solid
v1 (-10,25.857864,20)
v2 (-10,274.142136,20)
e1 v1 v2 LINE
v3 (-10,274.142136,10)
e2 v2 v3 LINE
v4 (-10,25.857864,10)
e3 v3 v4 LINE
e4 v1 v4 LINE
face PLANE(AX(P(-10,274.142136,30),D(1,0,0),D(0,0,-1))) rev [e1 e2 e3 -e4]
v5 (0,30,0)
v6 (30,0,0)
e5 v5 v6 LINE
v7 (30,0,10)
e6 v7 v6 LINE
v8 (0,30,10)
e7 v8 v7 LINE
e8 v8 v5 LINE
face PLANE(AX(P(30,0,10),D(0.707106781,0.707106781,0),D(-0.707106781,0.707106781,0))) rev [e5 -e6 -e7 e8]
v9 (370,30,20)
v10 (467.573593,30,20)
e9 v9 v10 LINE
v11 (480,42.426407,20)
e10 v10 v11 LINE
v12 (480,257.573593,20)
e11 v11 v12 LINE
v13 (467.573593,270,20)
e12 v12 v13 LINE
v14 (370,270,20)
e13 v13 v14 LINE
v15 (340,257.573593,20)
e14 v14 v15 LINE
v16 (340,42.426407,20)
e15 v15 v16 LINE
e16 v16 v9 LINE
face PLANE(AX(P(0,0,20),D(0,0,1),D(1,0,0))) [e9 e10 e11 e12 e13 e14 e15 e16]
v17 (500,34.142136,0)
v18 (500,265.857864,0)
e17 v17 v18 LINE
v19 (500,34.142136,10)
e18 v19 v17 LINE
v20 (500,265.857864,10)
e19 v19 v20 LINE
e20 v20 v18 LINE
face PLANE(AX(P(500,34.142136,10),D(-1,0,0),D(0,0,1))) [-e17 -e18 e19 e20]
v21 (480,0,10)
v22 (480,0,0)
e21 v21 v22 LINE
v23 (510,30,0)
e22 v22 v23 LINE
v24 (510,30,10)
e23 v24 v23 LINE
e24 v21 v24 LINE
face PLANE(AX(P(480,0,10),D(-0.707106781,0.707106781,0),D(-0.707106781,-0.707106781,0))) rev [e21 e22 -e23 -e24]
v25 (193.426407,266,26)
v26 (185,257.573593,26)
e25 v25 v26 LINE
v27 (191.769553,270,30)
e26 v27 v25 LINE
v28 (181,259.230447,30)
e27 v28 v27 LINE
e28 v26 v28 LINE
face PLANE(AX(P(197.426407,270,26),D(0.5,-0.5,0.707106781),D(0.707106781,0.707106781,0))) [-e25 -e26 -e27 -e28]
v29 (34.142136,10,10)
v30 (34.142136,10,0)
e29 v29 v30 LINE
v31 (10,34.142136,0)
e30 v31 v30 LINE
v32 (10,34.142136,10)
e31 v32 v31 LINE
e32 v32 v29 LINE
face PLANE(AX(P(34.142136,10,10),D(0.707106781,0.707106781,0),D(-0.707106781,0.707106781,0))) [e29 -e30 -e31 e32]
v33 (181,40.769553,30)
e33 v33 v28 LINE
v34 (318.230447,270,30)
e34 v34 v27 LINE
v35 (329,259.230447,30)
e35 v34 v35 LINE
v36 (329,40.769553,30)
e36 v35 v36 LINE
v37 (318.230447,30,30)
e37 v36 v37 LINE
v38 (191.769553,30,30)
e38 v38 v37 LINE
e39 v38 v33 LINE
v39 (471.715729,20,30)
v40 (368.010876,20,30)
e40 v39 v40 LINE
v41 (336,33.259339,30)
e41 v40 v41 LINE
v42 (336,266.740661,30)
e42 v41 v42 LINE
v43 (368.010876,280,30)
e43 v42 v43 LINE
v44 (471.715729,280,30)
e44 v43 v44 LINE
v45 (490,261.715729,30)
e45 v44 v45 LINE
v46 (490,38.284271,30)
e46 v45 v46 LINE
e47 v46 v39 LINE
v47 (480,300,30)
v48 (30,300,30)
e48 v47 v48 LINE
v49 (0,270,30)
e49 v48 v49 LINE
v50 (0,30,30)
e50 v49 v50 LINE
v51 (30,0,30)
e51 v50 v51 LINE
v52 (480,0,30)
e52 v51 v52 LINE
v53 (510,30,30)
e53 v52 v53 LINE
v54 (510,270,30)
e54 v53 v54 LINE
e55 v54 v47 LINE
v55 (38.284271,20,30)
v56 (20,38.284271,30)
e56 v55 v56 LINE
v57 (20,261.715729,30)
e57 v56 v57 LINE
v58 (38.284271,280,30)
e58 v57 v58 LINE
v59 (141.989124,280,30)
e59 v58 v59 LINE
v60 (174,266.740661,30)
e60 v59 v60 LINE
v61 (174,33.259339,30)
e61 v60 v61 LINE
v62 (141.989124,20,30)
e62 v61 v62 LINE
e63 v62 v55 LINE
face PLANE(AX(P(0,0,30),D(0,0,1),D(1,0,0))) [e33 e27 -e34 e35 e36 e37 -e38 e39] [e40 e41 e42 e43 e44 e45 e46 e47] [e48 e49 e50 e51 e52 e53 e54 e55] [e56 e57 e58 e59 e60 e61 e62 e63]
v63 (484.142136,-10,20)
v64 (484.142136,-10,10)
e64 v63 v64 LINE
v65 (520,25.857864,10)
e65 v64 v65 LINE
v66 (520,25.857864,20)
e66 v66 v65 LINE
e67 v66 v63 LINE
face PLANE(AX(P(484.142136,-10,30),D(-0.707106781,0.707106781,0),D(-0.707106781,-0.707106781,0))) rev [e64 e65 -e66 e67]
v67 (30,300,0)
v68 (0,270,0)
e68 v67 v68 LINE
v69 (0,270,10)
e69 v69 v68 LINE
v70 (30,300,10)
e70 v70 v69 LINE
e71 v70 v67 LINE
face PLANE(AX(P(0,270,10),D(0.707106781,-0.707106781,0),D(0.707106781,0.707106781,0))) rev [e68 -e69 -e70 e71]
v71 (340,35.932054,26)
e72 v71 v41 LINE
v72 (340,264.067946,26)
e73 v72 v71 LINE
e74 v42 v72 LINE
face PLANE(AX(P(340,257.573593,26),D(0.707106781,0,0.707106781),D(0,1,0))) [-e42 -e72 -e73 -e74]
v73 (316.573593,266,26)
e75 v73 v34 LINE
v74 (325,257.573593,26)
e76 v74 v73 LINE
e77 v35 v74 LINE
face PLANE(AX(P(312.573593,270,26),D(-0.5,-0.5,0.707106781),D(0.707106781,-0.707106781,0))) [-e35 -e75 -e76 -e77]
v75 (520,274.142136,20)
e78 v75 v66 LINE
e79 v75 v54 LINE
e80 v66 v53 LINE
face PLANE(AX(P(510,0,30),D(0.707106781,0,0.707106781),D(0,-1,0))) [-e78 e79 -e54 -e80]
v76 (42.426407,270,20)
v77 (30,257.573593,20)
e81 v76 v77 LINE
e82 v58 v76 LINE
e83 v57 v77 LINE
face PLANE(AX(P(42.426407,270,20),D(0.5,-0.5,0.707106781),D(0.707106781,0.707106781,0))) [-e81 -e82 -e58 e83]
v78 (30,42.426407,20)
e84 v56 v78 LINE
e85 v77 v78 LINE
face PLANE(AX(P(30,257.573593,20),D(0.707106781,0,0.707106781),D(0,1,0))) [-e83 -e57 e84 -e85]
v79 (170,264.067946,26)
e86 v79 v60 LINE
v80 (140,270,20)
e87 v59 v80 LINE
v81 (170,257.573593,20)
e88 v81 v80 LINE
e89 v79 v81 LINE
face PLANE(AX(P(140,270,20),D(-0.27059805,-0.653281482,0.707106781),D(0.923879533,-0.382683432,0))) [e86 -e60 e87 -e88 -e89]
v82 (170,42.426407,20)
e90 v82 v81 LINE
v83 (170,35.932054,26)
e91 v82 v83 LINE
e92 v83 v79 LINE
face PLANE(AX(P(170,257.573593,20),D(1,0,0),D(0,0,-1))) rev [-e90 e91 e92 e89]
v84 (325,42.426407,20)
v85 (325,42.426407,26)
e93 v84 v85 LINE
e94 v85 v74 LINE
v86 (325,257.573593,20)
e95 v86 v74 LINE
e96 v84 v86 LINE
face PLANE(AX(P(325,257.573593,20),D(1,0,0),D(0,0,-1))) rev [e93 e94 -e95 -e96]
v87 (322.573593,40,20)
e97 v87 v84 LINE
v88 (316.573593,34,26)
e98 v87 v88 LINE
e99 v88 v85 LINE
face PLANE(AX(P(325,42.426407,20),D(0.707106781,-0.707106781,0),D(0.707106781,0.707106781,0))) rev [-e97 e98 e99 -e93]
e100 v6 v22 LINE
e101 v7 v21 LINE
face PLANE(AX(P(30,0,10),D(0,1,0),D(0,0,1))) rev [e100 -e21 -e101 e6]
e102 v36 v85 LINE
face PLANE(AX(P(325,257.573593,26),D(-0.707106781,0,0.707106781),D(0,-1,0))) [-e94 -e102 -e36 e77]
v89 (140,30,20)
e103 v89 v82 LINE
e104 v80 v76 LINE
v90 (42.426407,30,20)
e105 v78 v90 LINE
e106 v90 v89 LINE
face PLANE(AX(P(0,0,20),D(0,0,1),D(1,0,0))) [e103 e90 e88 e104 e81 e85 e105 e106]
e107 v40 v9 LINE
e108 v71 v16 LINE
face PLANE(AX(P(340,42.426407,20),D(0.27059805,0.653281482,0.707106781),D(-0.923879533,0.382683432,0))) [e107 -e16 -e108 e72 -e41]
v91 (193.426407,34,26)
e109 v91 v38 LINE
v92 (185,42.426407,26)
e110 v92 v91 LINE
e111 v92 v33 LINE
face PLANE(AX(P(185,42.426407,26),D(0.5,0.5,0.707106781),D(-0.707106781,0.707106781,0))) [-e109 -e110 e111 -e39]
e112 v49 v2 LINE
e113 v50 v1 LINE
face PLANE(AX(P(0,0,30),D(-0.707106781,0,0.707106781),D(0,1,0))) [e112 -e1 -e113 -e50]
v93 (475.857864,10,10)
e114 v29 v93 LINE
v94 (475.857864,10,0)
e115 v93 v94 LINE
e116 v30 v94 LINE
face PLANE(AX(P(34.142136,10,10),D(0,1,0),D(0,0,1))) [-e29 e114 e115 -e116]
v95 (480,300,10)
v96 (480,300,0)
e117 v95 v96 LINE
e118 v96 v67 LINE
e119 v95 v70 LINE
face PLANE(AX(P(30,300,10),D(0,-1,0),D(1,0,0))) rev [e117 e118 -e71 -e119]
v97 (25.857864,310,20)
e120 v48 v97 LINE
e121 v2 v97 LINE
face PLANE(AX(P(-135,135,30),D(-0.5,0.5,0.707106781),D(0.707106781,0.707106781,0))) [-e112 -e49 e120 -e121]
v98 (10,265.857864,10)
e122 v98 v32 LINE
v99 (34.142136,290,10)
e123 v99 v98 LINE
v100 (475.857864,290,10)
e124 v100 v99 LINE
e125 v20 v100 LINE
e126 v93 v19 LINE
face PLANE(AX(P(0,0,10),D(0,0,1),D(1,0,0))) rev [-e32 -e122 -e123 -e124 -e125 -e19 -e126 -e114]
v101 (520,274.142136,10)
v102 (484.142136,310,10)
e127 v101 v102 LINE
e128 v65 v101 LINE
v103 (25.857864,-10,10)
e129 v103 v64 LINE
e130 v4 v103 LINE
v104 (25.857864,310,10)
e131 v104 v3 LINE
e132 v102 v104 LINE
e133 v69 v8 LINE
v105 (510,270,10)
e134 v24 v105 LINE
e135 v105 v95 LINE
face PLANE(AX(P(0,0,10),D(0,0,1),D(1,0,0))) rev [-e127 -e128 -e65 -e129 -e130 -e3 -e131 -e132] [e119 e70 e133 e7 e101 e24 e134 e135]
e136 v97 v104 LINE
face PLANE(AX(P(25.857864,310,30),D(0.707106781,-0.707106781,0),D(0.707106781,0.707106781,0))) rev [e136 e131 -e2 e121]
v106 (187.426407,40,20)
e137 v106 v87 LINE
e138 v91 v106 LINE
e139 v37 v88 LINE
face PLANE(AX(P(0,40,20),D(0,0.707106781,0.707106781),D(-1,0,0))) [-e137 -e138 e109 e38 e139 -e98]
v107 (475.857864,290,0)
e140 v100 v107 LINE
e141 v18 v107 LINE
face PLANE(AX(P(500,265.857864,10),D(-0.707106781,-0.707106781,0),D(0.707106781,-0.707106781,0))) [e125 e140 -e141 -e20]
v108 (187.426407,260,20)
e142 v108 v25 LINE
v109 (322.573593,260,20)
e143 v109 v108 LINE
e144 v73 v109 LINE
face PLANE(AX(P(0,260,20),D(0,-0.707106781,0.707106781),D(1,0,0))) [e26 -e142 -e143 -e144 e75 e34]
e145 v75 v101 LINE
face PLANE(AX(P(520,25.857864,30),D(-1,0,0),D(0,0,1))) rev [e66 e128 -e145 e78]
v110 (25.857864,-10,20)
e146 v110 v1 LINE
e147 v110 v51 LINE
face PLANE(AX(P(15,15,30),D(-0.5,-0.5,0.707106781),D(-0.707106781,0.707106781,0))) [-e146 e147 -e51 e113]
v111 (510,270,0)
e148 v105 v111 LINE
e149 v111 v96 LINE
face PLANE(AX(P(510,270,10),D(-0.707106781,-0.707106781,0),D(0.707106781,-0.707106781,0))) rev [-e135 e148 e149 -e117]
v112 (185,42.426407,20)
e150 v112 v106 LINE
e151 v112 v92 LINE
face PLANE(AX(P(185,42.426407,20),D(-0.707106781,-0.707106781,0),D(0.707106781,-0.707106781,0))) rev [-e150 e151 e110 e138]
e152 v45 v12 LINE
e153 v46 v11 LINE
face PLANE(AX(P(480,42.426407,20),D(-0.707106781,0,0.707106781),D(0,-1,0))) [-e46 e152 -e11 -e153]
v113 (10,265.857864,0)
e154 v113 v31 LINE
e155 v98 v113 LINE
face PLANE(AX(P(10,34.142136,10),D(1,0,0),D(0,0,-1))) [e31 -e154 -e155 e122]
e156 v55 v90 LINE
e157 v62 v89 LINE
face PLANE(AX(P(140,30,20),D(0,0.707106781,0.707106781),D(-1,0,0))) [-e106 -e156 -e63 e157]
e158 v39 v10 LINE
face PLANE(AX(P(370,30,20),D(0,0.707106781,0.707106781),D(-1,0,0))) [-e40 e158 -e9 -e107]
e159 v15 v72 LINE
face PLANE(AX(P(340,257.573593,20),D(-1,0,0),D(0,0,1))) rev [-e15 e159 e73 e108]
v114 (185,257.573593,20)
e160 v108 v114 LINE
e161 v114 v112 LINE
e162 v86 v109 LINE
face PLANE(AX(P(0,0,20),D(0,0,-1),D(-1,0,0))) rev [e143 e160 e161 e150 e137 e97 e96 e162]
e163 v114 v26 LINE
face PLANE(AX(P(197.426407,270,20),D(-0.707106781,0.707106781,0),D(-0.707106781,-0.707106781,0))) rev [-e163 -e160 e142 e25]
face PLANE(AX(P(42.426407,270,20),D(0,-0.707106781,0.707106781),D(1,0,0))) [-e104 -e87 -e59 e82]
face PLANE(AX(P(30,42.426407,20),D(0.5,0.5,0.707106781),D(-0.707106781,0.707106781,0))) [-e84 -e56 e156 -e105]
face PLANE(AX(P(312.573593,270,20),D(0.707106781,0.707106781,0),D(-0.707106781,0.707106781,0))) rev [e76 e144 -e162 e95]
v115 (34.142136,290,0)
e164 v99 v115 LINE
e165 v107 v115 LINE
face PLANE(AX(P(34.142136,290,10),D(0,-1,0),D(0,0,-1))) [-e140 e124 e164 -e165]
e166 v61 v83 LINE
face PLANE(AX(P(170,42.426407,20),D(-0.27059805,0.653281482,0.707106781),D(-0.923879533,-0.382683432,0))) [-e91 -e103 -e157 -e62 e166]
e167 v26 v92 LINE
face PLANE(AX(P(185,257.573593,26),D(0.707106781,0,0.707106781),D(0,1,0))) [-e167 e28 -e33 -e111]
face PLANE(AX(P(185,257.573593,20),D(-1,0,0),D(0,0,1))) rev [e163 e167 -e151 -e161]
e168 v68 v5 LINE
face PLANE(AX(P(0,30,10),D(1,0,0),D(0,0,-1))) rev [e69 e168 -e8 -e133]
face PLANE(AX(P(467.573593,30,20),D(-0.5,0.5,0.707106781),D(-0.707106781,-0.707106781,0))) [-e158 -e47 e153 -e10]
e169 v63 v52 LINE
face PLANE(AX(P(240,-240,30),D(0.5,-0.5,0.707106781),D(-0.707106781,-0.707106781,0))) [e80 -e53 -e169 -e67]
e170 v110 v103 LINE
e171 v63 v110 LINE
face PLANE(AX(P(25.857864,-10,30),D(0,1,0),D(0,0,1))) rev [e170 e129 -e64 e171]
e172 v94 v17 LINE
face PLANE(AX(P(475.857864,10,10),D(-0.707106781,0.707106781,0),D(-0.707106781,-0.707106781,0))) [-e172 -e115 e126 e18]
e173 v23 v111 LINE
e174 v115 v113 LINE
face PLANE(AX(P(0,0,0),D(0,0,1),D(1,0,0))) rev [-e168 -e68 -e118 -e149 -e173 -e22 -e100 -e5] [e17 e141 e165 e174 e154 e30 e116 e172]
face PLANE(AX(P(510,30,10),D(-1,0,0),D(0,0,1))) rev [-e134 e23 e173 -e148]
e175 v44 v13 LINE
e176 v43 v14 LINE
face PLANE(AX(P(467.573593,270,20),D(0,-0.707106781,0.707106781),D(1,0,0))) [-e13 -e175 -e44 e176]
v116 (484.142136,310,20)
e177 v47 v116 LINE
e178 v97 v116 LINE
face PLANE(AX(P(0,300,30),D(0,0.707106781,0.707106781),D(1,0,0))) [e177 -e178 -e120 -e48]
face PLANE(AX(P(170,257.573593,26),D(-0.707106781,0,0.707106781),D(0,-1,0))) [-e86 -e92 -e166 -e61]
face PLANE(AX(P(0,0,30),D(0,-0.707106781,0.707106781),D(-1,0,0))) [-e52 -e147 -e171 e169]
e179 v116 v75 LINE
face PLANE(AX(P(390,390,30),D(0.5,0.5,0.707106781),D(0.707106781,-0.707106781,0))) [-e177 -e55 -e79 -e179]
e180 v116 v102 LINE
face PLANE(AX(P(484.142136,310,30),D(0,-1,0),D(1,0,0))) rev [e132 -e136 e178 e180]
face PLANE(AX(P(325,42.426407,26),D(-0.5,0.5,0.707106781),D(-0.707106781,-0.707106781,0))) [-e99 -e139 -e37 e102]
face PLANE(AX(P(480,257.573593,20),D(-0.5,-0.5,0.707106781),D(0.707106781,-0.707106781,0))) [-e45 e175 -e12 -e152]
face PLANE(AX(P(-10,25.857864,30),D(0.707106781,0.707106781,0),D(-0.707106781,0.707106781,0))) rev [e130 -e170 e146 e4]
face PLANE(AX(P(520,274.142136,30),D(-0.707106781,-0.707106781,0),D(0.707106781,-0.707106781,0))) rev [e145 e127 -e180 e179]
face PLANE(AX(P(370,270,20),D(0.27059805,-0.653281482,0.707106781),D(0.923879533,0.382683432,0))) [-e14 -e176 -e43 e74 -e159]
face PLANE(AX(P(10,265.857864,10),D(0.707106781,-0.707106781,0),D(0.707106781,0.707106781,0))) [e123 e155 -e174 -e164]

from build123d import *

# Parameters (mm, degrees)
BOSS_EXTRU_1_DEPTH      = 10
BOSS_EXTRU_2_DEPTH      = 20
ENL_V_MAT_EXTRU_1_DEPTH = 10
CHANFREIN1_SIZE         = 10
CHANFREIN2_SIZE         = 10
CHANFREIN3_SIZE         = 4


# Some blends are built 0.0001 mm under size
with BuildPart() as part:
    # Esquisse1 → Boss.-Extru.1 (new body)
    with BuildSketch(Plane.XY):
        Polygon((0, 270), (30, 300), (480, 300), (510, 270), (510, 30), (480, 0), (30, 0), (0, 30), align=None)
        Polygon((10, 265.857864376), (34.142135624, 290), (475.857864376, 290), (500, 265.857864376), (500, 34.142135624), (475.857864376, 10), (34.142135624, 10), (10, 34.142135624), align=None, mode=Mode.SUBTRACT)
    extrude(amount=BOSS_EXTRU_1_DEPTH)

    # Esquisse2 → Boss.-Extru.2 (add)
    with BuildSketch(Plane.XY.offset(10)):
        Polygon((484.142135624, 310), (25.857864376, 310), (-10, 274.142135624), (-10, 25.857864376), (25.857864376, -10), (484.142135624, -10), (520, 25.857864376), (520, 274.142135624), align=None)
    extrude(amount=BOSS_EXTRU_2_DEPTH)

    # Esquisse3 → Enlèv. mat.-Extru.1 (cut)
    with BuildSketch(Plane.XY.offset(30)):
        Polygon((42.426406871, 270), (140, 270), (170, 257.573593129), (170, 42.426406871), (140, 30), (42.426406871, 30), (30, 42.426406871), (30, 257.573593129), align=None)
        Polygon((480, 257.573593129), (467.573593129, 270), (370, 270), (340, 257.573593129), (340, 42.426406871), (370, 30), (467.573593129, 30), (480, 42.426406871), align=None)
        Polygon((197.426406871, 270), (185, 257.573593129), (185, 42.426406871), (197.426406871, 30), (312.573593129, 30), (325, 42.426406871), (325, 257.573593129), (312.573593129, 270), (255, 270), align=None)
    extrude(amount=-ENL_V_MAT_EXTRU_1_DEPTH, mode=Mode.SUBTRACT)

    # Chanfrein1
    chanfrein1_edges = [part.edges().sort_by_distance(p)[0] for p in [
        (520, 150, 30),
        (502.071067812, 7.928932188, 30),
        (255, -10, 30),
        (7.928932188, 7.928932188, 30),
        (-10, 150, 30),
        (7.928932188, 292.071067812, 30),
        (255, 310, 30),
        (502.071067812, 292.071067812, 30),
        (473.786796564, 263.786796564, 30),
        (418.786796564, 270, 30),
        (355, 263.786796564, 30),
        (355, 36.213203436, 30),
        (418.786796564, 30, 30),
        (473.786796564, 36.213203436, 30),
        (480, 150, 30),
        (155, 36.213203436, 30),
        (155, 263.786796564, 30),
        (91.213203436, 270, 30),
        (36.213203436, 263.786796564, 30),
        (30, 150, 30),
        (36.213203436, 36.213203436, 30),
        (91.213203436, 30, 30),
    ]]
    chamfer(chanfrein1_edges, length=CHANFREIN1_SIZE - 0.0001)  # a hair under: the kernel refuses the full size

    # Chanfrein2
    chanfrein2_edges = [part.edges().sort_by_distance(p)[0] for p in [
        (255, 30, 20),
        (255, 270, 20),
    ]]
    chamfer(chanfrein2_edges, length=CHANFREIN2_SIZE - 0.0001)  # a hair under: the kernel refuses the full size

    # Chanfrein3
    # the kernel refuses this chamfer: 4 mm, written as the material it takes off along each edge
    with BuildSketch(Plane(origin=(340, 21.315861156, 30), x_dir=(-0.9996219169112968, 0, 0.027495876610586605), z_dir=(0, 1, 0))) as chanfrein3_piece_1_section:
        Polygon((CHANFREIN3_SIZE * 0.999621916911, -CHANFREIN3_SIZE * 0.0274958766106), (-CHANFREIN3_SIZE * 0.0274958766106, -CHANFREIN3_SIZE * 0.999621916911), (0, 0), align=None)
    chanfrein3_piece_1 = extrude(amount=257.368277689, mode=Mode.PRIVATE)
    chanfrein3_piece_1 = split(chanfrein3_piece_1, bisect_by=Plane(origin=(318.097162936, 199.689892736, -25.095613192), z_dir=(0.27059805007309734, -0.6532814824381883, 0.707106781186548)), keep=Keep.TOP, mode=Mode.PRIVATE)
    chanfrein3_piece_1 = split(chanfrein3_piece_1, bisect_by=Plane(origin=(318.097162936, 100.310107264, -25.095613192), z_dir=(0.27059805007309695, 0.6532814824381893, 0.7071067811865472)), keep=Keep.TOP, mode=Mode.PRIVATE)
    add(chanfrein3_piece_1, mode=Mode.SUBTRACT)
    with BuildSketch(Plane(origin=(170, 278.684138844, 30), x_dir=(0.9996219169112968, 0, 0.027495876610586414), z_dir=(0, -1, 0))) as chanfrein3_piece_2_section:
        Polygon((CHANFREIN3_SIZE * 0.999621916911, -CHANFREIN3_SIZE * 0.0274958766106), (-CHANFREIN3_SIZE * 0.0274958766106, -CHANFREIN3_SIZE * 0.999621916911), (0, 0), align=None)
    chanfrein3_piece_2 = extrude(amount=257.368277689, mode=Mode.PRIVATE)
    chanfrein3_piece_2 = split(chanfrein3_piece_2, bisect_by=Plane(origin=(191.902837064, 100.310107264, -25.095613192), z_dir=(-0.27059805007309856, 0.6532814824381883, 0.7071067811865475)), keep=Keep.TOP, mode=Mode.PRIVATE)
    chanfrein3_piece_2 = split(chanfrein3_piece_2, bisect_by=Plane(origin=(191.902837064, 199.689892736, -25.095613192), z_dir=(-0.2705980500730966, -0.6532814824381884, 0.7071067811865482)), keep=Keep.TOP, mode=Mode.PRIVATE)
    add(chanfrein3_piece_2, mode=Mode.SUBTRACT)
    with BuildSketch(Plane(origin=(332.273817919, 250.299775209, 30), x_dir=(-0.019442520806006888, -0.019442520806006888, -0.999621916911297), z_dir=(-0.7071067811865476, 0.7071067811865476, 0))) as chanfrein3_piece_3_section:
        Polygon((CHANFREIN3_SIZE * 0.999621916911, -CHANFREIN3_SIZE * 0.0274958766106), (-CHANFREIN3_SIZE * 0.0274958766106, -CHANFREIN3_SIZE * 0.999621916911), (0, 0), align=None)
    chanfrein3_piece_3 = extrude(amount=38.147057033, mode=Mode.PRIVATE)
    chanfrein3_piece_3 = split(chanfrein3_piece_3, bisect_by=Plane(origin=(320.298394929, 266.355378959, 26.355278959), z_dir=(0, -0.7071067811865467, 0.7071067811865485)), keep=Keep.TOP, mode=Mode.PRIVATE)
    chanfrein3_piece_3 = split(chanfrein3_piece_3, bisect_by=Plane(origin=(320.298394929, 270, 28.707260693), z_dir=(0, -1, 0)), keep=Keep.TOP, mode=Mode.PRIVATE)
    chanfrein3_piece_3 = split(chanfrein3_piece_3, bisect_by=Plane(origin=(325, 264.003397225, 28.707260693), z_dir=(-1, 0, 0)), keep=Keep.TOP, mode=Mode.PRIVATE)
    add(chanfrein3_piece_3, mode=Mode.SUBTRACT)
    with BuildSketch(Plane(origin=(204.700224791, 277.273817919, 30), x_dir=(0.019442520806013792, -0.019442520806013792, -0.9996219169112968), z_dir=(-0.7071067811865476, -0.7071067811865476, 0))) as chanfrein3_piece_4_section:
        Polygon((CHANFREIN3_SIZE * 0.999621916911, -CHANFREIN3_SIZE * 0.0274958766106), (-CHANFREIN3_SIZE * 0.0274958766106, -CHANFREIN3_SIZE * 0.999621916911), (0, 0), align=None)
    chanfrein3_piece_4 = extrude(amount=38.147057033, mode=Mode.PRIVATE)
    chanfrein3_piece_4 = split(chanfrein3_piece_4, bisect_by=Plane(origin=(189.701605071, 270, 28.707260693), z_dir=(0, -1, 0)), keep=Keep.TOP, mode=Mode.PRIVATE)
    chanfrein3_piece_4 = split(chanfrein3_piece_4, bisect_by=Plane(origin=(189.701605071, 266.355378959, 26.355278959), z_dir=(0, -0.7071067811865467, 0.7071067811865485)), keep=Keep.TOP, mode=Mode.PRIVATE)
    chanfrein3_piece_4 = split(chanfrein3_piece_4, bisect_by=Plane(origin=(185, 264.003397225, 28.707260693), z_dir=(1, 0, 0)), keep=Keep.TOP, mode=Mode.PRIVATE)
    add(chanfrein3_piece_4, mode=Mode.SUBTRACT)
    with BuildSketch(Plane(origin=(185, 267.860325081, 30), x_dir=(0.02749587661058907, 0, -0.9996219169112965), z_dir=(0, -1, 0))) as chanfrein3_piece_5_section:
        Polygon((CHANFREIN3_SIZE * 0.999621916911, -CHANFREIN3_SIZE * 0.0274958766106), (-CHANFREIN3_SIZE * 0.0274958766106, -CHANFREIN3_SIZE * 0.999621916911), (0, 0), align=None)
    chanfrein3_piece_5 = extrude(amount=235.720650161, mode=Mode.PRIVATE)
    chanfrein3_piece_5 = split(chanfrein3_piece_5, bisect_by=Plane(origin=(130.558397351, 203.13199048, 28.675713426), z_dir=(0.7071067811865476, -0.7071067811865476, 0)), keep=Keep.TOP, mode=Mode.PRIVATE)
    chanfrein3_piece_5 = split(chanfrein3_piece_5, bisect_by=Plane(origin=(130.558397351, 96.86800952, 28.675713426), z_dir=(0.7071067811865475, 0.7071067811865477, 0)), keep=Keep.TOP, mode=Mode.PRIVATE)
    add(chanfrein3_piece_5, mode=Mode.SUBTRACT)
    with BuildSketch(Plane(origin=(177.726182081, 49.700224791, 30), x_dir=(0.01944252080601465, 0.019442520806014656, -0.9996219169112968), z_dir=(0.7071067811865477, -0.7071067811865475, 0))) as chanfrein3_piece_6_section:
        Polygon((CHANFREIN3_SIZE * 0.999621916911, -CHANFREIN3_SIZE * 0.0274958766106), (-CHANFREIN3_SIZE * 0.0274958766106, -CHANFREIN3_SIZE * 0.999621916911), (0, 0), align=None)
    chanfrein3_piece_6 = extrude(amount=38.147057033, mode=Mode.PRIVATE)
    chanfrein3_piece_6 = split(chanfrein3_piece_6, bisect_by=Plane(origin=(185, 35.996602775, 28.707260693), z_dir=(1, 0, 0)), keep=Keep.TOP, mode=Mode.PRIVATE)
    chanfrein3_piece_6 = split(chanfrein3_piece_6, bisect_by=Plane(origin=(189.701605071, 30, 28.707260693), z_dir=(0, 1, 0)), keep=Keep.TOP, mode=Mode.PRIVATE)
    chanfrein3_piece_6 = split(chanfrein3_piece_6, bisect_by=Plane(origin=(189.701605071, 33.644621041, 26.355278959), z_dir=(0, 0.7071067811865475, 0.7071067811865477)), keep=Keep.TOP, mode=Mode.PRIVATE)
    add(chanfrein3_piece_6, mode=Mode.SUBTRACT)
    with BuildSketch(Plane(origin=(305.299775209, 22.726182081, 30), x_dir=(-0.0194425208060121, 0.01944252080601203, -0.9996219169112968), z_dir=(0.7071067811865464, 0.7071067811865488, 0))) as chanfrein3_piece_7_section:
        Polygon((CHANFREIN3_SIZE * 0.999621916911, -CHANFREIN3_SIZE * 0.0274958766106), (-CHANFREIN3_SIZE * 0.0274958766106, -CHANFREIN3_SIZE * 0.999621916911), (0, 0), align=None)
    chanfrein3_piece_7 = extrude(amount=38.147057033, mode=Mode.PRIVATE)
    chanfrein3_piece_7 = split(chanfrein3_piece_7, bisect_by=Plane(origin=(325, 35.996602775, 28.707260693), z_dir=(-1, 0, 0)), keep=Keep.TOP, mode=Mode.PRIVATE)
    chanfrein3_piece_7 = split(chanfrein3_piece_7, bisect_by=Plane(origin=(320.298394929, 33.644621041, 26.355278959), z_dir=(0, 0.7071067811865475, 0.7071067811865477)), keep=Keep.TOP, mode=Mode.PRIVATE)
    chanfrein3_piece_7 = split(chanfrein3_piece_7, bisect_by=Plane(origin=(320.298394929, 30, 28.707260693), z_dir=(0, 1, 0)), keep=Keep.TOP, mode=Mode.PRIVATE)
    add(chanfrein3_piece_7, mode=Mode.SUBTRACT)
    with BuildSketch(Plane(origin=(325, 32.139674919, 30), x_dir=(-0.02749587661058217, 0, -0.9996219169112968), z_dir=(0, 1, 0))) as chanfrein3_piece_8_section:
        Polygon((CHANFREIN3_SIZE * 0.999621916911, -CHANFREIN3_SIZE * 0.0274958766106), (-CHANFREIN3_SIZE * 0.0274958766106, -CHANFREIN3_SIZE * 0.999621916911), (0, 0), align=None)
    chanfrein3_piece_8 = extrude(amount=235.720650161, mode=Mode.PRIVATE)
    chanfrein3_piece_8 = split(chanfrein3_piece_8, bisect_by=Plane(origin=(379.441602649, 203.13199048, 28.675713426), z_dir=(-0.7071067811865476, -0.7071067811865476, 0)), keep=Keep.TOP, mode=Mode.PRIVATE)
    chanfrein3_piece_8 = split(chanfrein3_piece_8, bisect_by=Plane(origin=(379.441602649, 96.86800952, 28.675713426), z_dir=(-0.7071067811865488, 0.7071067811865464, 0)), keep=Keep.TOP, mode=Mode.PRIVATE)
    add(chanfrein3_piece_8, mode=Mode.SUBTRACT)
    with BuildSketch(Plane(origin=(332.273817919, 250.299775209, 30), x_dir=(-0.019442520806006888, -0.019442520806006888, -0.999621916911297), z_dir=(-0.7071067811865476, 0.7071067811865476, 0))) as chanfrein3_piece_9a_section:
        Polygon((CHANFREIN3_SIZE * 0.999621916911, -CHANFREIN3_SIZE * 0.0274958766106), (-CHANFREIN3_SIZE * 0.0274958766106, -CHANFREIN3_SIZE * 0.999621916911), (0, 0), align=None)
    chanfrein3_piece_9a = extrude(amount=38.147057033, mode=Mode.PRIVATE)
    chanfrein3_piece_9a = split(chanfrein3_piece_9a, bisect_by=Plane(origin=(325, 255.42873567, 28.7276275), z_dir=(1, 0, 0)), keep=Keep.TOP, mode=Mode.PRIVATE)
    with BuildSketch(Plane(origin=(325, 32.139674919, 30), x_dir=(-0.02749587661058217, 0, -0.9996219169112968), z_dir=(0, 1, 0))) as chanfrein3_piece_9b_section:
        Polygon((CHANFREIN3_SIZE * 0.999621916911, -CHANFREIN3_SIZE * 0.0274958766106), (-CHANFREIN3_SIZE * 0.0274958766106, -CHANFREIN3_SIZE * 0.999621916911), (0, 0), align=None)
    chanfrein3_piece_9b = extrude(amount=235.720650161, mode=Mode.PRIVATE)
    chanfrein3_piece_9b = split(chanfrein3_piece_9b, bisect_by=Plane(origin=(323.483356746, 259.090236382, 28.7276275), z_dir=(0.7071067811865476, 0.7071067811865476, 0)), keep=Keep.TOP, mode=Mode.PRIVATE)
    chanfrein3_piece_9 = chanfrein3_piece_9a & chanfrein3_piece_9b
    add(chanfrein3_piece_9, mode=Mode.SUBTRACT)
    with BuildSketch(Plane(origin=(204.700224791, 277.273817919, 30), x_dir=(0.019442520806013792, -0.019442520806013792, -0.9996219169112968), z_dir=(-0.7071067811865476, -0.7071067811865476, 0))) as chanfrein3_piece_10a_section:
        Polygon((CHANFREIN3_SIZE * 0.999621916911, -CHANFREIN3_SIZE * 0.0274958766106), (-CHANFREIN3_SIZE * 0.0274958766106, -CHANFREIN3_SIZE * 0.999621916911), (0, 0), align=None)
    chanfrein3_piece_10a = extrude(amount=38.147057033, mode=Mode.PRIVATE)
    chanfrein3_piece_10a = split(chanfrein3_piece_10a, bisect_by=Plane(origin=(185, 255.42873567, 28.7276275), z_dir=(-1, 0, 0)), keep=Keep.TOP, mode=Mode.PRIVATE)
    with BuildSketch(Plane(origin=(185, 267.860325081, 30), x_dir=(0.02749587661058907, 0, -0.9996219169112965), z_dir=(0, -1, 0))) as chanfrein3_piece_10b_section:
        Polygon((CHANFREIN3_SIZE * 0.999621916911, -CHANFREIN3_SIZE * 0.0274958766106), (-CHANFREIN3_SIZE * 0.0274958766106, -CHANFREIN3_SIZE * 0.999621916911), (0, 0), align=None)
    chanfrein3_piece_10b = extrude(amount=235.720650161, mode=Mode.PRIVATE)
    chanfrein3_piece_10b = split(chanfrein3_piece_10b, bisect_by=Plane(origin=(186.516643254, 259.090236382, 28.7276275), z_dir=(-0.7071067811865476, 0.7071067811865476, 0)), keep=Keep.TOP, mode=Mode.PRIVATE)
    chanfrein3_piece_10 = chanfrein3_piece_10a & chanfrein3_piece_10b
    add(chanfrein3_piece_10, mode=Mode.SUBTRACT)
    with BuildSketch(Plane(origin=(185, 267.860325081, 30), x_dir=(0.02749587661058907, 0, -0.9996219169112965), z_dir=(0, -1, 0))) as chanfrein3_piece_11a_section:
        Polygon((CHANFREIN3_SIZE * 0.999621916911, -CHANFREIN3_SIZE * 0.0274958766106), (-CHANFREIN3_SIZE * 0.0274958766106, -CHANFREIN3_SIZE * 0.999621916911), (0, 0), align=None)
    chanfrein3_piece_11a = extrude(amount=235.720650161, mode=Mode.PRIVATE)
    chanfrein3_piece_11a = split(chanfrein3_piece_11a, bisect_by=Plane(origin=(186.516643254, 40.909763618, 28.7276275), z_dir=(-0.7071067811865475, -0.7071067811865477, 0)), keep=Keep.TOP, mode=Mode.PRIVATE)
    with BuildSketch(Plane(origin=(177.726182081, 49.700224791, 30), x_dir=(0.01944252080601465, 0.019442520806014656, -0.9996219169112968), z_dir=(0.7071067811865477, -0.7071067811865475, 0))) as chanfrein3_piece_11b_section:
        Polygon((CHANFREIN3_SIZE * 0.999621916911, -CHANFREIN3_SIZE * 0.0274958766106), (-CHANFREIN3_SIZE * 0.0274958766106, -CHANFREIN3_SIZE * 0.999621916911), (0, 0), align=None)
    chanfrein3_piece_11b = extrude(amount=38.147057033, mode=Mode.PRIVATE)
    chanfrein3_piece_11b = split(chanfrein3_piece_11b, bisect_by=Plane(origin=(185, 44.57126433, 28.7276275), z_dir=(-1, 0, 0)), keep=Keep.TOP, mode=Mode.PRIVATE)
    chanfrein3_piece_11 = chanfrein3_piece_11a & chanfrein3_piece_11b
    add(chanfrein3_piece_11, mode=Mode.SUBTRACT)
    with BuildSketch(Plane(origin=(325, 32.139674919, 30), x_dir=(-0.02749587661058217, 0, -0.9996219169112968), z_dir=(0, 1, 0))) as chanfrein3_piece_12a_section:
        Polygon((CHANFREIN3_SIZE * 0.999621916911, -CHANFREIN3_SIZE * 0.0274958766106), (-CHANFREIN3_SIZE * 0.0274958766106, -CHANFREIN3_SIZE * 0.999621916911), (0, 0), align=None)
    chanfrein3_piece_12a = extrude(amount=235.720650161, mode=Mode.PRIVATE)
    chanfrein3_piece_12a = split(chanfrein3_piece_12a, bisect_by=Plane(origin=(323.483356746, 40.909763618, 28.7276275), z_dir=(0.7071067811865488, -0.7071067811865464, 0)), keep=Keep.TOP, mode=Mode.PRIVATE)
    with BuildSketch(Plane(origin=(305.299775209, 22.726182081, 30), x_dir=(-0.0194425208060121, 0.01944252080601203, -0.9996219169112968), z_dir=(0.7071067811865464, 0.7071067811865488, 0))) as chanfrein3_piece_12b_section:
        Polygon((CHANFREIN3_SIZE * 0.999621916911, -CHANFREIN3_SIZE * 0.0274958766106), (-CHANFREIN3_SIZE * 0.0274958766106, -CHANFREIN3_SIZE * 0.999621916911), (0, 0), align=None)
    chanfrein3_piece_12b = extrude(amount=38.147057033, mode=Mode.PRIVATE)
    chanfrein3_piece_12b = split(chanfrein3_piece_12b, bisect_by=Plane(origin=(325, 44.57126433, 28.7276275), z_dir=(1, 0, 0)), keep=Keep.TOP, mode=Mode.PRIVATE)
    chanfrein3_piece_12 = chanfrein3_piece_12a & chanfrein3_piece_12b
    add(chanfrein3_piece_12, mode=Mode.SUBTRACT)


solid = part.part
